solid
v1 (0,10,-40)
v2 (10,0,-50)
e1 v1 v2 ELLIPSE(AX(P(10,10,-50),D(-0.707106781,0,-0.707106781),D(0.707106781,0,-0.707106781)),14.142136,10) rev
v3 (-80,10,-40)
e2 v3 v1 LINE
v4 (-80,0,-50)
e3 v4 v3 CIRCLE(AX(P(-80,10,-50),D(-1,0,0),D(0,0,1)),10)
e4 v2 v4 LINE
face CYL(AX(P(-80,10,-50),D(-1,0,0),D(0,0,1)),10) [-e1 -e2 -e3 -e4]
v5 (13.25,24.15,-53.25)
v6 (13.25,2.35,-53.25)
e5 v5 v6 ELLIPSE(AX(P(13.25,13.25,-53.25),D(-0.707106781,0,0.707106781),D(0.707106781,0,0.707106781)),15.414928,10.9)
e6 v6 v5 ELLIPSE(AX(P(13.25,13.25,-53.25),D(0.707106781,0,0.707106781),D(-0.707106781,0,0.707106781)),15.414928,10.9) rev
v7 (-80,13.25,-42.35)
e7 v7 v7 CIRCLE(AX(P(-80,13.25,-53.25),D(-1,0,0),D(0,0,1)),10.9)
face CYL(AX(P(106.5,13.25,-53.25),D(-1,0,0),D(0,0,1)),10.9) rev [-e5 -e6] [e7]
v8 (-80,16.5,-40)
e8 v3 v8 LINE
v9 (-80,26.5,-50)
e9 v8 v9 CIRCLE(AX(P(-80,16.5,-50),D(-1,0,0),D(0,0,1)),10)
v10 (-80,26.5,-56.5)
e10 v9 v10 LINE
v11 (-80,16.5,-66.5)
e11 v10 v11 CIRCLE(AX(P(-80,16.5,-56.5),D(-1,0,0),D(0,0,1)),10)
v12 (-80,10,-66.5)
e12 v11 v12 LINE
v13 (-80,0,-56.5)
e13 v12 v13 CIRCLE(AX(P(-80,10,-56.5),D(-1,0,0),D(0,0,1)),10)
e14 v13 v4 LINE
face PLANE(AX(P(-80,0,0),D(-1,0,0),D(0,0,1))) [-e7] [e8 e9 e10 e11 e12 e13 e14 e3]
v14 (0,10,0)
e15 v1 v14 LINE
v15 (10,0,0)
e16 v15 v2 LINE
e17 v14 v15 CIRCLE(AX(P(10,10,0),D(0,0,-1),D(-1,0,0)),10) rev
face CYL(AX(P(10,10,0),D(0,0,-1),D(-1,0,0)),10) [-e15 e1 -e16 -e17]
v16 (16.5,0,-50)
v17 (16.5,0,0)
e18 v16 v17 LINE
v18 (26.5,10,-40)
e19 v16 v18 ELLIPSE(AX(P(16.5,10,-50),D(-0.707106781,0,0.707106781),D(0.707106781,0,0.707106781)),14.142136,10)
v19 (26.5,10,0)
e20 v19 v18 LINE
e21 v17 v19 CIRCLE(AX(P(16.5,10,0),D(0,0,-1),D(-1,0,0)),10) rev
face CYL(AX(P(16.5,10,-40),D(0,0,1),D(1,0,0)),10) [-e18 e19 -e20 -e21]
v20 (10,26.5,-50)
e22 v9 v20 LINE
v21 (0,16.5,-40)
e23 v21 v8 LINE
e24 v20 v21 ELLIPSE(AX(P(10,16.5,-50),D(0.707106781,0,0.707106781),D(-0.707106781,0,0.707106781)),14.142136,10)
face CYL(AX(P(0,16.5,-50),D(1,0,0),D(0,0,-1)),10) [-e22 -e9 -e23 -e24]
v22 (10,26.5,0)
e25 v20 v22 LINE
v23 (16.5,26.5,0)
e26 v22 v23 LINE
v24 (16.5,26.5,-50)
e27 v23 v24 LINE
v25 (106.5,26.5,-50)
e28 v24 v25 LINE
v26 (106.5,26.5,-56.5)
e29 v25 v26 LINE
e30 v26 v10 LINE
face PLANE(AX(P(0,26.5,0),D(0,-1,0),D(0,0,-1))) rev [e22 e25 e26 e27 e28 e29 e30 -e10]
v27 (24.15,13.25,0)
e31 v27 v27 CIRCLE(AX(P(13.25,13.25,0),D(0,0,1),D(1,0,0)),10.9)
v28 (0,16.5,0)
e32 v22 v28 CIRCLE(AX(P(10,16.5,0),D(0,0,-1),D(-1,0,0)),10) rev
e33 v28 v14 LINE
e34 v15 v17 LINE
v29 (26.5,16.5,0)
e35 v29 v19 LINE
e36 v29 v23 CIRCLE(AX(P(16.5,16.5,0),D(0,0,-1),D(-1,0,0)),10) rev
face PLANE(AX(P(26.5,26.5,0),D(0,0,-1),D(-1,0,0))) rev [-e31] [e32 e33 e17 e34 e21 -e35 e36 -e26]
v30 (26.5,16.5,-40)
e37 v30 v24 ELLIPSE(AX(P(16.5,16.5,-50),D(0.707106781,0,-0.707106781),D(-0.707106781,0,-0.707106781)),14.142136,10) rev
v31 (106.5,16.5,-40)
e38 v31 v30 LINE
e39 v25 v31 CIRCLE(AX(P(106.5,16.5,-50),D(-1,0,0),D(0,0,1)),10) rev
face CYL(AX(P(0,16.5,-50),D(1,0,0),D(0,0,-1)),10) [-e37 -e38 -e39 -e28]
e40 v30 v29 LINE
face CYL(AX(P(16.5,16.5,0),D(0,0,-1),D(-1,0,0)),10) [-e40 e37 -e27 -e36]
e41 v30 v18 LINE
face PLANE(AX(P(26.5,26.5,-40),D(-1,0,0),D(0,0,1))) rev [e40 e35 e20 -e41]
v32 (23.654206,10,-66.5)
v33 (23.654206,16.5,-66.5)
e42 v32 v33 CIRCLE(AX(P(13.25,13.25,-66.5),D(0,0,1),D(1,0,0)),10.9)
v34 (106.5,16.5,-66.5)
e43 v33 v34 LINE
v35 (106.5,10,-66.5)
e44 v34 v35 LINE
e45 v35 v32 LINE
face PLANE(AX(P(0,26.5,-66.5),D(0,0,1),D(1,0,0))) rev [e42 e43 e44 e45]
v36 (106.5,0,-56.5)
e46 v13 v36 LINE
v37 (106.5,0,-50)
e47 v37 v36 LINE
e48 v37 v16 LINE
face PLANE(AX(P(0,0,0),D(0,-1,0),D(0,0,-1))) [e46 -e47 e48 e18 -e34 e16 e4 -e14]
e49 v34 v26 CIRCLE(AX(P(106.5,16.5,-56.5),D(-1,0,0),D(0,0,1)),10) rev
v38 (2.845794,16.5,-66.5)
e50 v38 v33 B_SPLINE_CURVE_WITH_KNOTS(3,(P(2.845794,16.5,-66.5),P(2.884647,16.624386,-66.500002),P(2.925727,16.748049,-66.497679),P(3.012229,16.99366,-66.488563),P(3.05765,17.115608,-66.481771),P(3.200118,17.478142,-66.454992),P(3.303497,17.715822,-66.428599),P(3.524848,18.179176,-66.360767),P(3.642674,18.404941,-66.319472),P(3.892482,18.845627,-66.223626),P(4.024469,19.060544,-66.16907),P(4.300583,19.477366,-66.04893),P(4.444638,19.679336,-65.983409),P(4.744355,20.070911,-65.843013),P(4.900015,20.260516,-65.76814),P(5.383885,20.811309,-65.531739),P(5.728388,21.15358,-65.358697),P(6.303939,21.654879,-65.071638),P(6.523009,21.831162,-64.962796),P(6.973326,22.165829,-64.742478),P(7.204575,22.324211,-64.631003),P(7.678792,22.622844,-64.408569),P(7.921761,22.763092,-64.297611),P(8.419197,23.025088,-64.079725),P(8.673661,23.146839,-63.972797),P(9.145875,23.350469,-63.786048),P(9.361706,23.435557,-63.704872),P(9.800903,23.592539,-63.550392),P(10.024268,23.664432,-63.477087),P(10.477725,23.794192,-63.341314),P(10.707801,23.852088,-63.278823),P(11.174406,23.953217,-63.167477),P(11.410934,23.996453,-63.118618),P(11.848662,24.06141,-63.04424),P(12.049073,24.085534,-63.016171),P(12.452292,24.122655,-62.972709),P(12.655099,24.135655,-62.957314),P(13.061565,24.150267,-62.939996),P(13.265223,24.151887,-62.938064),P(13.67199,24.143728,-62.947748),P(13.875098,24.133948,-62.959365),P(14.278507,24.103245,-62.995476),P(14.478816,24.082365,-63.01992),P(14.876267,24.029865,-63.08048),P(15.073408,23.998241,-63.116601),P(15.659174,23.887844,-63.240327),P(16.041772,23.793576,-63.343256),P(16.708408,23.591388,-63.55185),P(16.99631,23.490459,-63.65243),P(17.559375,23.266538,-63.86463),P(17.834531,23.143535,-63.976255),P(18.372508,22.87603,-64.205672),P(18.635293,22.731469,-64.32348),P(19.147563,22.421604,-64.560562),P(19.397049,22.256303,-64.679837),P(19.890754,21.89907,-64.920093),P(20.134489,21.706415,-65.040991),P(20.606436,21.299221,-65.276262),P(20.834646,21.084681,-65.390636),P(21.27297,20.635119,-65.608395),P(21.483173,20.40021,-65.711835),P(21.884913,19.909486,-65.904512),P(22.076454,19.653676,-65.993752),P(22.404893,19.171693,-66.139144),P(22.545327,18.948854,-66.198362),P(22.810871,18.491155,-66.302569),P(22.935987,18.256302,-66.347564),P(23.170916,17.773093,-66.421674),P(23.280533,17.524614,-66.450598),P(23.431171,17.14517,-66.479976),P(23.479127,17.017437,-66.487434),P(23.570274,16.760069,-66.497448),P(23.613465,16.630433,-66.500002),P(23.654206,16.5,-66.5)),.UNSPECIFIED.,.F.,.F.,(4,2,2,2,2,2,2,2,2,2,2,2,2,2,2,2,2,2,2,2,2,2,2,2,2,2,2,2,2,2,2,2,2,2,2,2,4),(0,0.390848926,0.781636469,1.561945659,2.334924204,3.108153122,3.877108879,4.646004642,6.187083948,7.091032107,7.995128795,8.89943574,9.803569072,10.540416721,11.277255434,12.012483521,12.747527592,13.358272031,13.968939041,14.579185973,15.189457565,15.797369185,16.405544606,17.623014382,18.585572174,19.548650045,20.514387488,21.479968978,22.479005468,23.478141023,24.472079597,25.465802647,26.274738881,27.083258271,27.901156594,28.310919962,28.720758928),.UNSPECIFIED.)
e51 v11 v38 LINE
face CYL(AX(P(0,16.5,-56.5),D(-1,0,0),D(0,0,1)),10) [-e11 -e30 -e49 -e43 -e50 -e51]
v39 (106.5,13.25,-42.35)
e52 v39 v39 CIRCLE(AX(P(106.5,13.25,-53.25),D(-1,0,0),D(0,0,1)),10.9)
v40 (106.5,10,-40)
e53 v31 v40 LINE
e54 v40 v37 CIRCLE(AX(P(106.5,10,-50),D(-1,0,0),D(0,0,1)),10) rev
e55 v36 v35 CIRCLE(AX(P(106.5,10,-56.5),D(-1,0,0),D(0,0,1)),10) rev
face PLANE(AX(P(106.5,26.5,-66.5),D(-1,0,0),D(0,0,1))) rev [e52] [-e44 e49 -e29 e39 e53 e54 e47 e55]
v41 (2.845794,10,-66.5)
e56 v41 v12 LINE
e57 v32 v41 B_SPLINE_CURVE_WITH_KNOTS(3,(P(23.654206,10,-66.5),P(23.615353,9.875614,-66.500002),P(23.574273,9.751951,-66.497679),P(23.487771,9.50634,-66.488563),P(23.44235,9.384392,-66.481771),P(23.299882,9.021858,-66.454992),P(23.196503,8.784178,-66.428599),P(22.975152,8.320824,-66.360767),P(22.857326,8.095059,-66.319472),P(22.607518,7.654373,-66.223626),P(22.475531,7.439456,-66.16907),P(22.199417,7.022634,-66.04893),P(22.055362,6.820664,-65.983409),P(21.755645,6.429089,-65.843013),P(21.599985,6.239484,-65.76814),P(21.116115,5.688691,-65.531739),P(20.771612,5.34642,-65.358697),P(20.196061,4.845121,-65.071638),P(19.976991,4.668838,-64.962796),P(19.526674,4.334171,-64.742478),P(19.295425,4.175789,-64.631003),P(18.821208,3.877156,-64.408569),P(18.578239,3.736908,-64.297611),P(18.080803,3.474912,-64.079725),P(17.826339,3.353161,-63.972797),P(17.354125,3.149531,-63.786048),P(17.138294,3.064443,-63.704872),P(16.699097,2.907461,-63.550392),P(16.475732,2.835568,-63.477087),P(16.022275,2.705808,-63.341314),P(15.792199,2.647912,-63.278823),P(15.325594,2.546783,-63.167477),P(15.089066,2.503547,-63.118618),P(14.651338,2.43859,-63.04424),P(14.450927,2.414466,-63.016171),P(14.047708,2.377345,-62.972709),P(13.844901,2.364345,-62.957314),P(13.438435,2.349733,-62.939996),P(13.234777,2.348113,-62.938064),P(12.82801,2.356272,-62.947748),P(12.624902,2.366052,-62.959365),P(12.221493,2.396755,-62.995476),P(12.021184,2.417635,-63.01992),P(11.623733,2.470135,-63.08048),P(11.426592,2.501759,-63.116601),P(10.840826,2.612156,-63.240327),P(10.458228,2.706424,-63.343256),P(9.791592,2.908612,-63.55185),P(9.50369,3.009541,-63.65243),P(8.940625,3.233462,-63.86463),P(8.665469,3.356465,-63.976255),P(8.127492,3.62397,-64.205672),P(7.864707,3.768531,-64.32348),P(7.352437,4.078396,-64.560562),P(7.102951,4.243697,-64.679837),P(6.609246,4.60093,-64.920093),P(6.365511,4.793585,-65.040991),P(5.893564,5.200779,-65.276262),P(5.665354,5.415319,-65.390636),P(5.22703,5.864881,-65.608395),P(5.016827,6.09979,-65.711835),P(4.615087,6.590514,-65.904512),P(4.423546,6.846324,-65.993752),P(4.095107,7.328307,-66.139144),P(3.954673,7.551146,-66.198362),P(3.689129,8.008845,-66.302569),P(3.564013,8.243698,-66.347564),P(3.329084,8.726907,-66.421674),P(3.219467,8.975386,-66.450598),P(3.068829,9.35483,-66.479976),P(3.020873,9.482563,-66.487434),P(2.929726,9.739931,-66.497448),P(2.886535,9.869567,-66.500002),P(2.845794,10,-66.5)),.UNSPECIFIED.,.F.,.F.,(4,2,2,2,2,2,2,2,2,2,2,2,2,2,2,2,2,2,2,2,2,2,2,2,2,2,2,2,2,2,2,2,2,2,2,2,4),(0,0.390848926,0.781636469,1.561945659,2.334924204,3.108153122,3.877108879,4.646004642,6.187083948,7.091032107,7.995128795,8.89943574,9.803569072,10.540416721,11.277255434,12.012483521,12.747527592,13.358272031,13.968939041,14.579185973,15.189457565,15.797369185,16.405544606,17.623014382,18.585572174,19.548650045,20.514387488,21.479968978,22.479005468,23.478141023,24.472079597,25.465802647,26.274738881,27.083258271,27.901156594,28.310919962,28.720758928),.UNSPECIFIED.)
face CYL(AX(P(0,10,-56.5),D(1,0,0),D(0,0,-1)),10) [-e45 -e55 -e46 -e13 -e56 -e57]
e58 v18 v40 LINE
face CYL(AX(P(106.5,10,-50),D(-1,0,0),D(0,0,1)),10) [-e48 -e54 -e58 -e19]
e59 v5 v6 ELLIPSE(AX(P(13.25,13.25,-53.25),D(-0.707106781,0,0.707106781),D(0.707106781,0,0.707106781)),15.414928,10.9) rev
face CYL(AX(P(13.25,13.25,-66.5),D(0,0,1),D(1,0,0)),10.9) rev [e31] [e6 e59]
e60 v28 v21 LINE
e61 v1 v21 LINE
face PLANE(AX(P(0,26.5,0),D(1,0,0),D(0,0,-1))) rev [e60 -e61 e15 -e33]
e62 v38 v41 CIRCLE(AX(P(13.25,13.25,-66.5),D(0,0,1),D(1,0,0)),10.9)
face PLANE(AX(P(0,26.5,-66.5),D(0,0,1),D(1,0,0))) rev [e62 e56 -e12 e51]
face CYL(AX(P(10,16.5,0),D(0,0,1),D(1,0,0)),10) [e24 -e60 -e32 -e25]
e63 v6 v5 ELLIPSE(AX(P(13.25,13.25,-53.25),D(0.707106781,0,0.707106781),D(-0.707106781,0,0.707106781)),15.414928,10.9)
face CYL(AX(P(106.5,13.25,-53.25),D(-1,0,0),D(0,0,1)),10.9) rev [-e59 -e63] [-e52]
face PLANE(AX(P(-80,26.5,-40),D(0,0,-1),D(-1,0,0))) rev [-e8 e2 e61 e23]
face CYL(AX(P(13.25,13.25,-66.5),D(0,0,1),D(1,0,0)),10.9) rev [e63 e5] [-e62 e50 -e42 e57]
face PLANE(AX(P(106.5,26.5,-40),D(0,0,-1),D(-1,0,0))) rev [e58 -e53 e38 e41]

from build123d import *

# Parameters (mm, degrees)
BOSS_EXTRUDE1_DEPTH = 26.5
SKETCH3_R           = 10.9
CUT_EXTRUDE1_DEPTH  = 129.322835068
SKETCH6_W           = 26.5
SKETCH6_H           = 26.5
BOSS_EXTRUDE3_DEPTH = 80
SKETCH7_R           = 10.9
CUT_EXTRUDE2_DEPTH  = 200.766738973
FILLET1_R           = 10


with BuildPart() as part:
    # Sketch2 → Boss-Extrude1 (new body)
    with BuildSketch(Plane(origin=(0, 0, 0), x_dir=(1, 0, 0), z_dir=(0, 1, 0))):
        Polygon((0, 0), (0, 66.5), (106.5, 66.5), (106.5, 40), (26.5, 40), (26.5, 0), align=None)
    extrude(amount=BOSS_EXTRUDE1_DEPTH)

    # Sketch3 → Cut-Extrude1 (cut, through all)
    with BuildSketch(Plane.XY):
        with Locations((13.25, 13.25)):
            Circle(SKETCH3_R)
    extrude(amount=-CUT_EXTRUDE1_DEPTH, mode=Mode.SUBTRACT)

    # Sketch6 → Boss-Extrude3 (add)
    with BuildSketch(Plane.ZY):
        with Locations((-53.25, 13.25)):
            Rectangle(SKETCH6_W, SKETCH6_H)
    extrude(amount=BOSS_EXTRUDE3_DEPTH)

    # Sketch7 → Cut-Extrude2 (cut, through all)
    with BuildSketch(Plane.ZY.offset(80)):
        with Locations((-53.25, 13.25)):
            Circle(SKETCH7_R)
    extrude(amount=-CUT_EXTRUDE2_DEPTH, mode=Mode.SUBTRACT)

    # Fillet1
    # the kernel refuses this fillet: 10 mm, written as the material it takes off along each edge
    with BuildSketch(Plane(origin=(106.5, 26.5, -40), x_dir=(0, 0, -1), z_dir=(-1, 0, 0))) as fillet1_piece_1:
        with BuildLine():
            CenterArc((FILLET1_R, FILLET1_R), FILLET1_R, 180, 90)
            Line((0, FILLET1_R), (-FILLET1_R * 0.02, FILLET1_R))
            Line((-FILLET1_R * 0.02, FILLET1_R), (-FILLET1_R * 0.02, -FILLET1_R * 0.02))
            Line((-FILLET1_R * 0.02, -FILLET1_R * 0.02), (FILLET1_R, -FILLET1_R * 0.02))
            Line((FILLET1_R, -FILLET1_R * 0.02), (FILLET1_R, 0))
        make_face()
    extrude(amount=80, mode=Mode.SUBTRACT)
    with BuildSketch(Plane(origin=(106.5, 26.5, -66.5), x_dir=(0, 0, 1), z_dir=(-1, 0, 0)), Plane(origin=(-80, 0, -66.5), x_dir=(0, 0, 1), z_dir=(1, 0, 0))) as fillet1_piece_2:
        with BuildLine():
            CenterArc((FILLET1_R, -FILLET1_R), FILLET1_R, 90, 90)
            Line((0, -FILLET1_R), (-FILLET1_R * 0.02, -FILLET1_R))
            Line((-FILLET1_R * 0.02, -FILLET1_R), (-FILLET1_R * 0.02, FILLET1_R * 0.02))
            Line((-FILLET1_R * 0.02, FILLET1_R * 0.02), (FILLET1_R, FILLET1_R * 0.02))
            Line((FILLET1_R, FILLET1_R * 0.02), (FILLET1_R, 0))
        make_face()
    extrude(amount=186.5, mode=Mode.SUBTRACT)
    with BuildSketch(Plane(origin=(0, 0, 0), x_dir=(0, 1, 0), z_dir=(0, 0, -1)), Plane(origin=(26.5, 26.5, -40), x_dir=(-1, 0, 0), z_dir=(0, 0, 1))) as fillet1_piece_3:
        with BuildLine():
            CenterArc((FILLET1_R, FILLET1_R), FILLET1_R, 180, 90)
            Line((0, FILLET1_R), (-FILLET1_R * 0.02, FILLET1_R))
            Line((-FILLET1_R * 0.02, FILLET1_R), (-FILLET1_R * 0.02, -FILLET1_R * 0.02))
            Line((-FILLET1_R * 0.02, -FILLET1_R * 0.02), (FILLET1_R, -FILLET1_R * 0.02))
            Line((FILLET1_R, -FILLET1_R * 0.02), (FILLET1_R, 0))
        make_face()
    extrude(amount=40, mode=Mode.SUBTRACT)
    with BuildSketch(Plane(origin=(0, 26.5, 0), x_dir=(0, -1, 0), z_dir=(0, 0, -1)), Plane(origin=(26.5, 0, -40), x_dir=(-1, 0, 0), z_dir=(0, 0, 1))) as fillet1_piece_4:
        with BuildLine():
            CenterArc((FILLET1_R, -FILLET1_R), FILLET1_R, 90, 90)
            Line((0, -FILLET1_R), (-FILLET1_R * 0.02, -FILLET1_R))
            Line((-FILLET1_R * 0.02, -FILLET1_R), (-FILLET1_R * 0.02, FILLET1_R * 0.02))
            Line((-FILLET1_R * 0.02, FILLET1_R * 0.02), (FILLET1_R, FILLET1_R * 0.02))
            Line((FILLET1_R, FILLET1_R * 0.02), (FILLET1_R, 0))
        make_face()
    extrude(amount=40, mode=Mode.SUBTRACT)
    with BuildSketch(Plane(origin=(0, 0, -40), x_dir=(0, 0, -1), z_dir=(-1, 0, 0)), Plane(origin=(0, 26.5, -40), x_dir=(0, -1, 0), z_dir=(-1, 0, 0)), Plane(origin=(106.5, 0, -40), x_dir=(0, 0, -1), z_dir=(-1, 0, 0))) as fillet1_piece_5:
        with BuildLine():
            CenterArc((FILLET1_R, -FILLET1_R), FILLET1_R, 90, 90)
            Line((0, -FILLET1_R), (-FILLET1_R * 0.02, -FILLET1_R))
            Line((-FILLET1_R * 0.02, -FILLET1_R), (-FILLET1_R * 0.02, FILLET1_R * 0.02))
            Line((-FILLET1_R * 0.02, FILLET1_R * 0.02), (FILLET1_R, FILLET1_R * 0.02))
            Line((FILLET1_R, FILLET1_R * 0.02), (FILLET1_R, 0))
        make_face()
    extrude(amount=80, mode=Mode.SUBTRACT)
    with BuildSketch(Plane(origin=(106.5, 26.5, -40), x_dir=(0, 0, -1), z_dir=(-1, 0, 0))) as fillet1_piece_6a_section:
        with BuildLine():
            CenterArc((FILLET1_R, FILLET1_R), FILLET1_R, 180, 90)
            Line((0, FILLET1_R), (-FILLET1_R * 0.02, FILLET1_R))
            Line((-FILLET1_R * 0.02, FILLET1_R), (-FILLET1_R * 0.02, -FILLET1_R * 0.02))
            Line((-FILLET1_R * 0.02, -FILLET1_R * 0.02), (FILLET1_R, -FILLET1_R * 0.02))
            Line((FILLET1_R, -FILLET1_R * 0.02), (FILLET1_R, 0))
        make_face()
    fillet1_piece_6a = extrude(amount=105, mode=Mode.PRIVATE)
    fillet1_piece_6a = split(fillet1_piece_6a, bisect_by=Plane(origin=(26.5, 24.236048857, -42.263951143), z_dir=(-1, 0, 0)), keep=Keep.TOP, mode=Mode.PRIVATE)
    with BuildSketch(Plane(origin=(26.5, 26.5, -65), x_dir=(-1, 0, 0), z_dir=(0, 0, 1))) as fillet1_piece_6b_section:
        with BuildLine():
            CenterArc((FILLET1_R, FILLET1_R), FILLET1_R, 180, 90)
            Line((0, FILLET1_R), (-FILLET1_R * 0.02, FILLET1_R))
            Line((-FILLET1_R * 0.02, FILLET1_R), (-FILLET1_R * 0.02, -FILLET1_R * 0.02))
            Line((-FILLET1_R * 0.02, -FILLET1_R * 0.02), (FILLET1_R, -FILLET1_R * 0.02))
            Line((FILLET1_R, -FILLET1_R * 0.02), (FILLET1_R, 0))
        make_face()
    fillet1_piece_6b = extrude(amount=65, mode=Mode.PRIVATE)
    fillet1_piece_6b = split(fillet1_piece_6b, bisect_by=Plane(origin=(24.236048857, 24.236048857, -40), z_dir=(0, 0, -1)), keep=Keep.TOP, mode=Mode.PRIVATE)
    fillet1_piece_6 = fillet1_piece_6a & fillet1_piece_6b
    add(fillet1_piece_6, mode=Mode.SUBTRACT)
    with BuildSketch(Plane(origin=(0, 0, 0), x_dir=(0, 1, 0), z_dir=(0, 0, -1))) as fillet1_piece_7a_section:
        with BuildLine():
            CenterArc((FILLET1_R, FILLET1_R), FILLET1_R, 180, 90)
            Line((0, FILLET1_R), (-FILLET1_R * 0.02, FILLET1_R))
            Line((-FILLET1_R * 0.02, FILLET1_R), (-FILLET1_R * 0.02, -FILLET1_R * 0.02))
            Line((-FILLET1_R * 0.02, -FILLET1_R * 0.02), (FILLET1_R, -FILLET1_R * 0.02))
            Line((FILLET1_R, -FILLET1_R * 0.02), (FILLET1_R, 0))
        make_face()
    fillet1_piece_7a = extrude(amount=65, mode=Mode.PRIVATE)
    fillet1_piece_7a = split(fillet1_piece_7a, bisect_by=Plane(origin=(2.263951143, 2.263951143, -40), z_dir=(0, 0, -1)), keep=Keep.TOP, mode=Mode.PRIVATE)
    with BuildSketch(Plane(origin=(25, 0, -40), x_dir=(0, 0, -1), z_dir=(-1, 0, 0))) as fillet1_piece_7b_section:
        with BuildLine():
            CenterArc((FILLET1_R, -FILLET1_R), FILLET1_R, 90, 90)
            Line((0, -FILLET1_R), (-FILLET1_R * 0.02, -FILLET1_R))
            Line((-FILLET1_R * 0.02, -FILLET1_R), (-FILLET1_R * 0.02, FILLET1_R * 0.02))
            Line((-FILLET1_R * 0.02, FILLET1_R * 0.02), (FILLET1_R, FILLET1_R * 0.02))
            Line((FILLET1_R, FILLET1_R * 0.02), (FILLET1_R, 0))
        make_face()
    fillet1_piece_7b = extrude(amount=105, mode=Mode.PRIVATE)
    fillet1_piece_7b = split(fillet1_piece_7b, bisect_by=Plane(origin=(0, 2.263951143, -42.263951143), z_dir=(1, 0, 0)), keep=Keep.TOP, mode=Mode.PRIVATE)
    fillet1_piece_7 = fillet1_piece_7a & fillet1_piece_7b
    add(fillet1_piece_7, mode=Mode.SUBTRACT)
    with BuildSketch(Plane(origin=(0, 26.5, 0), x_dir=(0, -1, 0), z_dir=(0, 0, -1))) as fillet1_piece_8a_section:
        with BuildLine():
            CenterArc((FILLET1_R, -FILLET1_R), FILLET1_R, 90, 90)
            Line((0, -FILLET1_R), (-FILLET1_R * 0.02, -FILLET1_R))
            Line((-FILLET1_R * 0.02, -FILLET1_R), (-FILLET1_R * 0.02, FILLET1_R * 0.02))
            Line((-FILLET1_R * 0.02, FILLET1_R * 0.02), (FILLET1_R, FILLET1_R * 0.02))
            Line((FILLET1_R, FILLET1_R * 0.02), (FILLET1_R, 0))
        make_face()
    fillet1_piece_8a = extrude(amount=65, mode=Mode.PRIVATE)
    fillet1_piece_8a = split(fillet1_piece_8a, bisect_by=Plane(origin=(2.263951143, 24.236048857, -40), z_dir=(0, 0, -1)), keep=Keep.TOP, mode=Mode.PRIVATE)
    with BuildSketch(Plane(origin=(25, 26.5, -40), x_dir=(0, -1, 0), z_dir=(-1, 0, 0))) as fillet1_piece_8b_section:
        with BuildLine():
            CenterArc((FILLET1_R, -FILLET1_R), FILLET1_R, 90, 90)
            Line((0, -FILLET1_R), (-FILLET1_R * 0.02, -FILLET1_R))
            Line((-FILLET1_R * 0.02, -FILLET1_R), (-FILLET1_R * 0.02, FILLET1_R * 0.02))
            Line((-FILLET1_R * 0.02, FILLET1_R * 0.02), (FILLET1_R, FILLET1_R * 0.02))
            Line((FILLET1_R, FILLET1_R * 0.02), (FILLET1_R, 0))
        make_face()
    fillet1_piece_8b = extrude(amount=105, mode=Mode.PRIVATE)
    fillet1_piece_8b = split(fillet1_piece_8b, bisect_by=Plane(origin=(0, 24.236048857, -42.263951143), z_dir=(1, 0, 0)), keep=Keep.TOP, mode=Mode.PRIVATE)
    fillet1_piece_8 = fillet1_piece_8a & fillet1_piece_8b
    add(fillet1_piece_8, mode=Mode.SUBTRACT)
    with BuildSketch(Plane(origin=(106.5, 0, -40), x_dir=(0, 0, -1), z_dir=(-1, 0, 0))) as fillet1_piece_9a_section:
        with BuildLine():
            CenterArc((FILLET1_R, -FILLET1_R), FILLET1_R, 90, 90)
            Line((0, -FILLET1_R), (-FILLET1_R * 0.02, -FILLET1_R))
            Line((-FILLET1_R * 0.02, -FILLET1_R), (-FILLET1_R * 0.02, FILLET1_R * 0.02))
            Line((-FILLET1_R * 0.02, FILLET1_R * 0.02), (FILLET1_R, FILLET1_R * 0.02))
            Line((FILLET1_R, FILLET1_R * 0.02), (FILLET1_R, 0))
        make_face()
    fillet1_piece_9a = extrude(amount=105, mode=Mode.PRIVATE)
    fillet1_piece_9a = split(fillet1_piece_9a, bisect_by=Plane(origin=(26.5, 2.263951143, -42.263951143), z_dir=(-1, 0, 0)), keep=Keep.TOP, mode=Mode.PRIVATE)
    with BuildSketch(Plane(origin=(26.5, 0, -65), x_dir=(-1, 0, 0), z_dir=(0, 0, 1))) as fillet1_piece_9b_section:
        with BuildLine():
            CenterArc((FILLET1_R, -FILLET1_R), FILLET1_R, 90, 90)
            Line((0, -FILLET1_R), (-FILLET1_R * 0.02, -FILLET1_R))
            Line((-FILLET1_R * 0.02, -FILLET1_R), (-FILLET1_R * 0.02, FILLET1_R * 0.02))
            Line((-FILLET1_R * 0.02, FILLET1_R * 0.02), (FILLET1_R, FILLET1_R * 0.02))
            Line((FILLET1_R, FILLET1_R * 0.02), (FILLET1_R, 0))
        make_face()
    fillet1_piece_9b = extrude(amount=65, mode=Mode.PRIVATE)
    fillet1_piece_9b = split(fillet1_piece_9b, bisect_by=Plane(origin=(24.236048857, 2.263951143, -40), z_dir=(0, 0, -1)), keep=Keep.TOP, mode=Mode.PRIVATE)
    fillet1_piece_9 = fillet1_piece_9a & fillet1_piece_9b
    add(fillet1_piece_9, mode=Mode.SUBTRACT)


solid = part.part
